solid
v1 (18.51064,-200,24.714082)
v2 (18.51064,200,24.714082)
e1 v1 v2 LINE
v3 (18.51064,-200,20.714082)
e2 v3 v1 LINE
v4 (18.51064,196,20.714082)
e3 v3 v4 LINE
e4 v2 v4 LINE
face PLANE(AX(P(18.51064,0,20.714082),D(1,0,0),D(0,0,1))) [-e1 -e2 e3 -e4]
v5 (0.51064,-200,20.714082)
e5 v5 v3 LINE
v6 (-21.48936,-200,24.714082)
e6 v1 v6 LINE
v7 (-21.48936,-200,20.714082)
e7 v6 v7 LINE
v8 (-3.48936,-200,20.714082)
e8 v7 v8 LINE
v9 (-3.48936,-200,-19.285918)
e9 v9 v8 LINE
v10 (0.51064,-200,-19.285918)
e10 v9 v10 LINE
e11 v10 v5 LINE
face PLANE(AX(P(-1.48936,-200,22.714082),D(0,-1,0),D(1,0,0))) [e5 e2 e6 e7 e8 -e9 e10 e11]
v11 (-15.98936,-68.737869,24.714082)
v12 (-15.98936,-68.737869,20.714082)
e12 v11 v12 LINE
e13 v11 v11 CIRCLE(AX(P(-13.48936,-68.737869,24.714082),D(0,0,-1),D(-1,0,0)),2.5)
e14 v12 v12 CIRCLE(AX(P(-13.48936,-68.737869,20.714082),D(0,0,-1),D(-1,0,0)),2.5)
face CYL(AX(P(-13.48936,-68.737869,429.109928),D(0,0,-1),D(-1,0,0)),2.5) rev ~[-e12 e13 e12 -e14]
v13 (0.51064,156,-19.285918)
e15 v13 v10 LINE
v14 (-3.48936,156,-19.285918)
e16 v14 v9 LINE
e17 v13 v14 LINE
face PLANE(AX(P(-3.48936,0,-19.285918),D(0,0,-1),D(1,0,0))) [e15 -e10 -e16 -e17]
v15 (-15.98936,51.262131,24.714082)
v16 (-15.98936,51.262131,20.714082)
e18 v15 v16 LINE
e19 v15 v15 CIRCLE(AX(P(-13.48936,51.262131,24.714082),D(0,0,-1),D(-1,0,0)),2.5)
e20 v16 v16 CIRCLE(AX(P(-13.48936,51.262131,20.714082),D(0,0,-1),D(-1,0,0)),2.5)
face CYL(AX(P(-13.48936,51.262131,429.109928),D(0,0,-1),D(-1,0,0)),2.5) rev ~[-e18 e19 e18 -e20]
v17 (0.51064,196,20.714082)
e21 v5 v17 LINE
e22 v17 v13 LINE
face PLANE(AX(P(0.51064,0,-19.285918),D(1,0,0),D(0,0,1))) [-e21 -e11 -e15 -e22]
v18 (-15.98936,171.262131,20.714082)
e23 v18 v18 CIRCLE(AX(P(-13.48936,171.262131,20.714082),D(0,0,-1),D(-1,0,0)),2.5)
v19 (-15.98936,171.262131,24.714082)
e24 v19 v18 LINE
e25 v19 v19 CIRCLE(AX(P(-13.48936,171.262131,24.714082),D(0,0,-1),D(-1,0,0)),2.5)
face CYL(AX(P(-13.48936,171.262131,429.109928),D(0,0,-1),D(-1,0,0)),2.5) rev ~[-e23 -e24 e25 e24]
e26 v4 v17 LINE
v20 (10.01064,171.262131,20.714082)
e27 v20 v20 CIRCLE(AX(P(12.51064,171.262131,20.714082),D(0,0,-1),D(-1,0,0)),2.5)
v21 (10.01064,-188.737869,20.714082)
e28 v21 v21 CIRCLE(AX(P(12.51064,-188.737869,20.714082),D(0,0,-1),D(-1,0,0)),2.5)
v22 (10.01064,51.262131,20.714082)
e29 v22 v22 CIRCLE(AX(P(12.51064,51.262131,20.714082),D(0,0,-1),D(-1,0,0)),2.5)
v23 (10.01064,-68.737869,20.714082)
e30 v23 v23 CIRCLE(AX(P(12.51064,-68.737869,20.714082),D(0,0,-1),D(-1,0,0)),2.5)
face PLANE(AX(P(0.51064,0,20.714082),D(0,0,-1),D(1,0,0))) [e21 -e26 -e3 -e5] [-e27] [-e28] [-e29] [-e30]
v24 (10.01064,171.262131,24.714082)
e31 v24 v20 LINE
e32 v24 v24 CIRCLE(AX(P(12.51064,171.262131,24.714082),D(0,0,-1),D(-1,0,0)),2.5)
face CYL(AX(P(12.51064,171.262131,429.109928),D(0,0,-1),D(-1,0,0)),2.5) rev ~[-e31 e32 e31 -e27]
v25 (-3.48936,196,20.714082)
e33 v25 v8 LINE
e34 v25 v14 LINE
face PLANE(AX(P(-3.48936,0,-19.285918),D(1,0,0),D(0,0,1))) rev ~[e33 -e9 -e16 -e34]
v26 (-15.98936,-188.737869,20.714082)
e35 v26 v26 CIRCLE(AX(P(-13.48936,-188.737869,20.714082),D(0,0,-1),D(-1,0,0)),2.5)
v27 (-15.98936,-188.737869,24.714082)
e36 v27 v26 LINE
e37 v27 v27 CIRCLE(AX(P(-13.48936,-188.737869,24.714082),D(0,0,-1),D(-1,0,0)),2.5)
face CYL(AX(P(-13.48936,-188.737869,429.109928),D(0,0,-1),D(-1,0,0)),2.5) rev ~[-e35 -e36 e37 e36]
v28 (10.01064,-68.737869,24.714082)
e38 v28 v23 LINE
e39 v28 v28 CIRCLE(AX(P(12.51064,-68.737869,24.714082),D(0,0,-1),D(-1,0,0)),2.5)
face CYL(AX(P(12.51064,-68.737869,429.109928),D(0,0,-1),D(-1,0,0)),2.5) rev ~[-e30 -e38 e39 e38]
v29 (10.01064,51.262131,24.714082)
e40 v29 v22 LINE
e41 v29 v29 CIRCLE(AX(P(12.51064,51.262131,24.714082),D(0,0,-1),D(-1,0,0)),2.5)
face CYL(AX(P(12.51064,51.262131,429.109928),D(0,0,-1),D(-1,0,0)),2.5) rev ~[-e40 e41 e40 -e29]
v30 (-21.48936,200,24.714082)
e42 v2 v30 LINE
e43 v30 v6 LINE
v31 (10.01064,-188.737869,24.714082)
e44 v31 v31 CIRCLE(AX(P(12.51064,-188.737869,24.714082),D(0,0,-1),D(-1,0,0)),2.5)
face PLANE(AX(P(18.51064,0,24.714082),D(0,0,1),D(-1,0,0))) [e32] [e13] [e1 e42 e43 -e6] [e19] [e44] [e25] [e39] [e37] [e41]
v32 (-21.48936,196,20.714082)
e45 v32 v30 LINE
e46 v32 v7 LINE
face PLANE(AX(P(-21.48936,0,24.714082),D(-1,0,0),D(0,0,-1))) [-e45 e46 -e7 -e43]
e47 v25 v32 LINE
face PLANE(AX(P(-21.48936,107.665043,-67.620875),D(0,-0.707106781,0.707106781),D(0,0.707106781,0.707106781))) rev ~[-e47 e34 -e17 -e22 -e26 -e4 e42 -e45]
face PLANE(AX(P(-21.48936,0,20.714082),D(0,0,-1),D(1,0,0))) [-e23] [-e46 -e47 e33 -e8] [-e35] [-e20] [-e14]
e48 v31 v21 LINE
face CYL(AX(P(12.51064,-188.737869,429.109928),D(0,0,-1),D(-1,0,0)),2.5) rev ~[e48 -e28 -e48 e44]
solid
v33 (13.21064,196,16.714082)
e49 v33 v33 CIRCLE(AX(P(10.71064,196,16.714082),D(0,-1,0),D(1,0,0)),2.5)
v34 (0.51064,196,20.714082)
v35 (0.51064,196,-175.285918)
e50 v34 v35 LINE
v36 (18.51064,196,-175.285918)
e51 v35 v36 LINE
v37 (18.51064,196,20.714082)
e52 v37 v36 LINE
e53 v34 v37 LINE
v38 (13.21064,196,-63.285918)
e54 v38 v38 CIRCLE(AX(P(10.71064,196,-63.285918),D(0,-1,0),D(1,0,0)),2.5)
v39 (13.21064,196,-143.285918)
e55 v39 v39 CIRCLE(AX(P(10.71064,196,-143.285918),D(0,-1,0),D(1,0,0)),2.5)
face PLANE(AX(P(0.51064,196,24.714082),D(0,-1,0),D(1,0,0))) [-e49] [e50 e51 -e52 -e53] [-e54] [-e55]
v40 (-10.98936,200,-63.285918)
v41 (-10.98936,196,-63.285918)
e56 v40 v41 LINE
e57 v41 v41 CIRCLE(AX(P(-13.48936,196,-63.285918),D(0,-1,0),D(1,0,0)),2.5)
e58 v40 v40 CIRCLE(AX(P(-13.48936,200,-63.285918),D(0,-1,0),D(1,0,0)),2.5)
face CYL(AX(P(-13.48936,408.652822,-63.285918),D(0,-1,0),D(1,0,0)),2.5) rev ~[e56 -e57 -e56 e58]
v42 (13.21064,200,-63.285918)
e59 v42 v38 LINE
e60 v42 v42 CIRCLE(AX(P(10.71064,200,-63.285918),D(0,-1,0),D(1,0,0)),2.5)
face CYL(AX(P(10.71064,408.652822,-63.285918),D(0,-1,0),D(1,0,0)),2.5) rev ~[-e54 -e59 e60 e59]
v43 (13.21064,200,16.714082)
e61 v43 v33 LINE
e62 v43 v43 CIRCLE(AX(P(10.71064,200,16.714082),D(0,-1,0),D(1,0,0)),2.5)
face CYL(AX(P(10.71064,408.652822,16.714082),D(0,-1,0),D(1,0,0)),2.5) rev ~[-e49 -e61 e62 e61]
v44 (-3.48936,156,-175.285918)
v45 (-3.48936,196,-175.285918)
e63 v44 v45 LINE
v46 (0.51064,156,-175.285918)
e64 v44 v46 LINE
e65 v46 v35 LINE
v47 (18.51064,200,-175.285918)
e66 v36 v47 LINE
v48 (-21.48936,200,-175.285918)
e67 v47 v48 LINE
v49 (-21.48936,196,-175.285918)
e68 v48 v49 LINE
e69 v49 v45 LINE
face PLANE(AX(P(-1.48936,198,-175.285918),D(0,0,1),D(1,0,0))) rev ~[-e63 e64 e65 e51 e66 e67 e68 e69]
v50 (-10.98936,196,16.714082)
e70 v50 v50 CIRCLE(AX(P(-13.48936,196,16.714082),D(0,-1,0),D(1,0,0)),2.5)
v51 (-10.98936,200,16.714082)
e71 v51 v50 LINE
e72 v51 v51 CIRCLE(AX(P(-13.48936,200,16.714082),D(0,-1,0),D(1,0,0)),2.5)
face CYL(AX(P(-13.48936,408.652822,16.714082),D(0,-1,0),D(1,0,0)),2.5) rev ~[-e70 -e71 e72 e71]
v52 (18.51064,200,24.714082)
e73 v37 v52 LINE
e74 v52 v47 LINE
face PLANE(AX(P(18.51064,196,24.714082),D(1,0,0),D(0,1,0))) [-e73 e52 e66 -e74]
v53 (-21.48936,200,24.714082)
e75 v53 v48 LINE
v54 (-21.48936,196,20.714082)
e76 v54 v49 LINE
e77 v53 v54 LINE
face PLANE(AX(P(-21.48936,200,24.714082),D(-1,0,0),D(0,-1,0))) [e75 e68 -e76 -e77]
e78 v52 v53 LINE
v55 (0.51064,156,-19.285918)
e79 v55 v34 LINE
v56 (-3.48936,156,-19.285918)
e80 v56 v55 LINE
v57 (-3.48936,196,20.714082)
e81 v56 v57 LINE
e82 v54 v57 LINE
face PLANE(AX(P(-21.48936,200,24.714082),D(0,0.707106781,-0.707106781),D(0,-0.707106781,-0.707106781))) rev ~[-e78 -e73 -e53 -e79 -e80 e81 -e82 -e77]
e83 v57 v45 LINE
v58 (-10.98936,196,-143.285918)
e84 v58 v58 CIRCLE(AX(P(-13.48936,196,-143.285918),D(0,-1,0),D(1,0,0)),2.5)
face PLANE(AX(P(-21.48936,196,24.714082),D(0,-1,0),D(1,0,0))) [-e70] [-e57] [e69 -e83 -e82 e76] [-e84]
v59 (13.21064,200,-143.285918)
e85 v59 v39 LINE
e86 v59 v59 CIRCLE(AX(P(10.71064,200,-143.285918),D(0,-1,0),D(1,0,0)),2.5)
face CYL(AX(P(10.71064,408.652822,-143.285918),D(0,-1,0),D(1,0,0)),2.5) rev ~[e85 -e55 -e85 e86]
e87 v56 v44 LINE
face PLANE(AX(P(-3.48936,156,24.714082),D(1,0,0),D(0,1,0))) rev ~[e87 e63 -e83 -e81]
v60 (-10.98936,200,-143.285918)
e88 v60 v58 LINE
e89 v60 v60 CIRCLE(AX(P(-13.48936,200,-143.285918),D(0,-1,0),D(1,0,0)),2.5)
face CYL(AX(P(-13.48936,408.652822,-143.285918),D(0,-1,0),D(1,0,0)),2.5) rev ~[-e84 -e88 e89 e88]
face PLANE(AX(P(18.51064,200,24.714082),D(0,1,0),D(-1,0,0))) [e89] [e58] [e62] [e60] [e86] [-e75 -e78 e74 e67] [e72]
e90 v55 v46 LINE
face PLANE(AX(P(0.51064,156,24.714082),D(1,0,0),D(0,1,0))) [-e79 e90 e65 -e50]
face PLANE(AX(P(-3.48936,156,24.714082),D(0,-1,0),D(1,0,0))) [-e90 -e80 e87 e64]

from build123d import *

# Parameters (mm, degrees)
F0_W     = 4
F0_H     = 40
F1_DEPTH = 200
F3_DEPTH = 51.9
F4_W     = 4
F4_H     = 40
F5_DEPTH = 200
F7_DEPTH = 41.7
F9_D     = 5
F11_D    = 5


with BuildPart() as f1:
    # F0 (on Front) → F1 (new body, symmetric)
    with BuildSketch(Plane.XZ):
        Polygon((18.5106403343, 24.7140824073), (-21.4893596657, 24.7140824073), (-21.4893596657, 20.7140824073), (-3.4893596657, 20.7140824073), (0.5106403343, 20.7140824073), (18.5106403343, 20.7140824073), align=None)
        with Locations((-1.4893596657, 0.7140824073)):
            Rectangle(F0_W, F0_H)
    extrude(amount=F1_DEPTH, both=True)

    # F2 (on face) → F3 (cut, symmetric)
    with BuildSketch(Plane(origin=(-21.4893596657, 0, 0), x_dir=(0, -1, 0), z_dir=(-1, 0, 0))):
        Polygon((-107.6650425279, -67.6208750648), (-196, 20.7140824073), (-200, 20.7140824073), (-200, -67.6208750648), align=None)
        Polygon((-196, 20.7140824073), (-200, 24.7140824073), (-200, 20.7140824073), align=None)
    extrude(amount=F3_DEPTH, both=True, mode=Mode.SUBTRACT)

    # F9 (through all)
    with Locations(Plane.XY.offset(24.7140824073)):
        with Locations((-13.4893596657, 171.2621307373), (12.5106403343, 171.2621307373), (12.5106403343, 51.2621307373), (-13.4893596657, 51.2621307373), (-13.4893596657, -68.7378692627), (12.5106403343, -68.7378692627), (-13.4893596657, -188.7378692627), (12.5106403343, -188.7378692627)):
            Hole(F9_D / 2)


with BuildPart() as f5:
    # F4 (on face) → F5 (new body)
    with BuildSketch(Plane.XY.offset(24.7140824073)):
        Polygon((18.5106403343, 200), (-21.4893596657, 200), (-21.4893596657, 196), (-3.4893596657, 196), (0.5106403343, 196), (18.5106403343, 196), align=None)
        with Locations((-1.4893596657, 176)):
            Rectangle(F4_W, F4_H)
    extrude(amount=-F5_DEPTH)

    # F6 (on face) → F7 (cut)
    with BuildSketch(Plane(origin=(-21.4893596657, 0, 0), x_dir=(0, -1, 0), z_dir=(-1, 0, 0))):
        Polygon((-196, 24.7140824073), (-196, 20.7140824073), (-144.8176057225, -30.4683118701), (-144.8176057225, 24.7140824073), align=None)
        Polygon((-196, 24.7140824073), (-200, 24.7140824073), (-196, 20.7140824073), align=None)
    extrude(amount=-F7_DEPTH, mode=Mode.SUBTRACT)

    # F11 (through all)
    with Locations(Plane(origin=(0, 200, 0), x_dir=(-1, 0, 0), z_dir=(0, 1, 0))):
        with Locations((-10.7106403343, 16.7140824073), (13.4893596657, 16.7140824073), (13.4893596657, -63.2859175927), (-10.7106403343, -63.2859175927), (-10.7106403343, -143.2859175927), (13.4893596657, -143.2859175927)):
            Hole(F11_D / 2)


solid = Compound([f1.part, f5.part])
